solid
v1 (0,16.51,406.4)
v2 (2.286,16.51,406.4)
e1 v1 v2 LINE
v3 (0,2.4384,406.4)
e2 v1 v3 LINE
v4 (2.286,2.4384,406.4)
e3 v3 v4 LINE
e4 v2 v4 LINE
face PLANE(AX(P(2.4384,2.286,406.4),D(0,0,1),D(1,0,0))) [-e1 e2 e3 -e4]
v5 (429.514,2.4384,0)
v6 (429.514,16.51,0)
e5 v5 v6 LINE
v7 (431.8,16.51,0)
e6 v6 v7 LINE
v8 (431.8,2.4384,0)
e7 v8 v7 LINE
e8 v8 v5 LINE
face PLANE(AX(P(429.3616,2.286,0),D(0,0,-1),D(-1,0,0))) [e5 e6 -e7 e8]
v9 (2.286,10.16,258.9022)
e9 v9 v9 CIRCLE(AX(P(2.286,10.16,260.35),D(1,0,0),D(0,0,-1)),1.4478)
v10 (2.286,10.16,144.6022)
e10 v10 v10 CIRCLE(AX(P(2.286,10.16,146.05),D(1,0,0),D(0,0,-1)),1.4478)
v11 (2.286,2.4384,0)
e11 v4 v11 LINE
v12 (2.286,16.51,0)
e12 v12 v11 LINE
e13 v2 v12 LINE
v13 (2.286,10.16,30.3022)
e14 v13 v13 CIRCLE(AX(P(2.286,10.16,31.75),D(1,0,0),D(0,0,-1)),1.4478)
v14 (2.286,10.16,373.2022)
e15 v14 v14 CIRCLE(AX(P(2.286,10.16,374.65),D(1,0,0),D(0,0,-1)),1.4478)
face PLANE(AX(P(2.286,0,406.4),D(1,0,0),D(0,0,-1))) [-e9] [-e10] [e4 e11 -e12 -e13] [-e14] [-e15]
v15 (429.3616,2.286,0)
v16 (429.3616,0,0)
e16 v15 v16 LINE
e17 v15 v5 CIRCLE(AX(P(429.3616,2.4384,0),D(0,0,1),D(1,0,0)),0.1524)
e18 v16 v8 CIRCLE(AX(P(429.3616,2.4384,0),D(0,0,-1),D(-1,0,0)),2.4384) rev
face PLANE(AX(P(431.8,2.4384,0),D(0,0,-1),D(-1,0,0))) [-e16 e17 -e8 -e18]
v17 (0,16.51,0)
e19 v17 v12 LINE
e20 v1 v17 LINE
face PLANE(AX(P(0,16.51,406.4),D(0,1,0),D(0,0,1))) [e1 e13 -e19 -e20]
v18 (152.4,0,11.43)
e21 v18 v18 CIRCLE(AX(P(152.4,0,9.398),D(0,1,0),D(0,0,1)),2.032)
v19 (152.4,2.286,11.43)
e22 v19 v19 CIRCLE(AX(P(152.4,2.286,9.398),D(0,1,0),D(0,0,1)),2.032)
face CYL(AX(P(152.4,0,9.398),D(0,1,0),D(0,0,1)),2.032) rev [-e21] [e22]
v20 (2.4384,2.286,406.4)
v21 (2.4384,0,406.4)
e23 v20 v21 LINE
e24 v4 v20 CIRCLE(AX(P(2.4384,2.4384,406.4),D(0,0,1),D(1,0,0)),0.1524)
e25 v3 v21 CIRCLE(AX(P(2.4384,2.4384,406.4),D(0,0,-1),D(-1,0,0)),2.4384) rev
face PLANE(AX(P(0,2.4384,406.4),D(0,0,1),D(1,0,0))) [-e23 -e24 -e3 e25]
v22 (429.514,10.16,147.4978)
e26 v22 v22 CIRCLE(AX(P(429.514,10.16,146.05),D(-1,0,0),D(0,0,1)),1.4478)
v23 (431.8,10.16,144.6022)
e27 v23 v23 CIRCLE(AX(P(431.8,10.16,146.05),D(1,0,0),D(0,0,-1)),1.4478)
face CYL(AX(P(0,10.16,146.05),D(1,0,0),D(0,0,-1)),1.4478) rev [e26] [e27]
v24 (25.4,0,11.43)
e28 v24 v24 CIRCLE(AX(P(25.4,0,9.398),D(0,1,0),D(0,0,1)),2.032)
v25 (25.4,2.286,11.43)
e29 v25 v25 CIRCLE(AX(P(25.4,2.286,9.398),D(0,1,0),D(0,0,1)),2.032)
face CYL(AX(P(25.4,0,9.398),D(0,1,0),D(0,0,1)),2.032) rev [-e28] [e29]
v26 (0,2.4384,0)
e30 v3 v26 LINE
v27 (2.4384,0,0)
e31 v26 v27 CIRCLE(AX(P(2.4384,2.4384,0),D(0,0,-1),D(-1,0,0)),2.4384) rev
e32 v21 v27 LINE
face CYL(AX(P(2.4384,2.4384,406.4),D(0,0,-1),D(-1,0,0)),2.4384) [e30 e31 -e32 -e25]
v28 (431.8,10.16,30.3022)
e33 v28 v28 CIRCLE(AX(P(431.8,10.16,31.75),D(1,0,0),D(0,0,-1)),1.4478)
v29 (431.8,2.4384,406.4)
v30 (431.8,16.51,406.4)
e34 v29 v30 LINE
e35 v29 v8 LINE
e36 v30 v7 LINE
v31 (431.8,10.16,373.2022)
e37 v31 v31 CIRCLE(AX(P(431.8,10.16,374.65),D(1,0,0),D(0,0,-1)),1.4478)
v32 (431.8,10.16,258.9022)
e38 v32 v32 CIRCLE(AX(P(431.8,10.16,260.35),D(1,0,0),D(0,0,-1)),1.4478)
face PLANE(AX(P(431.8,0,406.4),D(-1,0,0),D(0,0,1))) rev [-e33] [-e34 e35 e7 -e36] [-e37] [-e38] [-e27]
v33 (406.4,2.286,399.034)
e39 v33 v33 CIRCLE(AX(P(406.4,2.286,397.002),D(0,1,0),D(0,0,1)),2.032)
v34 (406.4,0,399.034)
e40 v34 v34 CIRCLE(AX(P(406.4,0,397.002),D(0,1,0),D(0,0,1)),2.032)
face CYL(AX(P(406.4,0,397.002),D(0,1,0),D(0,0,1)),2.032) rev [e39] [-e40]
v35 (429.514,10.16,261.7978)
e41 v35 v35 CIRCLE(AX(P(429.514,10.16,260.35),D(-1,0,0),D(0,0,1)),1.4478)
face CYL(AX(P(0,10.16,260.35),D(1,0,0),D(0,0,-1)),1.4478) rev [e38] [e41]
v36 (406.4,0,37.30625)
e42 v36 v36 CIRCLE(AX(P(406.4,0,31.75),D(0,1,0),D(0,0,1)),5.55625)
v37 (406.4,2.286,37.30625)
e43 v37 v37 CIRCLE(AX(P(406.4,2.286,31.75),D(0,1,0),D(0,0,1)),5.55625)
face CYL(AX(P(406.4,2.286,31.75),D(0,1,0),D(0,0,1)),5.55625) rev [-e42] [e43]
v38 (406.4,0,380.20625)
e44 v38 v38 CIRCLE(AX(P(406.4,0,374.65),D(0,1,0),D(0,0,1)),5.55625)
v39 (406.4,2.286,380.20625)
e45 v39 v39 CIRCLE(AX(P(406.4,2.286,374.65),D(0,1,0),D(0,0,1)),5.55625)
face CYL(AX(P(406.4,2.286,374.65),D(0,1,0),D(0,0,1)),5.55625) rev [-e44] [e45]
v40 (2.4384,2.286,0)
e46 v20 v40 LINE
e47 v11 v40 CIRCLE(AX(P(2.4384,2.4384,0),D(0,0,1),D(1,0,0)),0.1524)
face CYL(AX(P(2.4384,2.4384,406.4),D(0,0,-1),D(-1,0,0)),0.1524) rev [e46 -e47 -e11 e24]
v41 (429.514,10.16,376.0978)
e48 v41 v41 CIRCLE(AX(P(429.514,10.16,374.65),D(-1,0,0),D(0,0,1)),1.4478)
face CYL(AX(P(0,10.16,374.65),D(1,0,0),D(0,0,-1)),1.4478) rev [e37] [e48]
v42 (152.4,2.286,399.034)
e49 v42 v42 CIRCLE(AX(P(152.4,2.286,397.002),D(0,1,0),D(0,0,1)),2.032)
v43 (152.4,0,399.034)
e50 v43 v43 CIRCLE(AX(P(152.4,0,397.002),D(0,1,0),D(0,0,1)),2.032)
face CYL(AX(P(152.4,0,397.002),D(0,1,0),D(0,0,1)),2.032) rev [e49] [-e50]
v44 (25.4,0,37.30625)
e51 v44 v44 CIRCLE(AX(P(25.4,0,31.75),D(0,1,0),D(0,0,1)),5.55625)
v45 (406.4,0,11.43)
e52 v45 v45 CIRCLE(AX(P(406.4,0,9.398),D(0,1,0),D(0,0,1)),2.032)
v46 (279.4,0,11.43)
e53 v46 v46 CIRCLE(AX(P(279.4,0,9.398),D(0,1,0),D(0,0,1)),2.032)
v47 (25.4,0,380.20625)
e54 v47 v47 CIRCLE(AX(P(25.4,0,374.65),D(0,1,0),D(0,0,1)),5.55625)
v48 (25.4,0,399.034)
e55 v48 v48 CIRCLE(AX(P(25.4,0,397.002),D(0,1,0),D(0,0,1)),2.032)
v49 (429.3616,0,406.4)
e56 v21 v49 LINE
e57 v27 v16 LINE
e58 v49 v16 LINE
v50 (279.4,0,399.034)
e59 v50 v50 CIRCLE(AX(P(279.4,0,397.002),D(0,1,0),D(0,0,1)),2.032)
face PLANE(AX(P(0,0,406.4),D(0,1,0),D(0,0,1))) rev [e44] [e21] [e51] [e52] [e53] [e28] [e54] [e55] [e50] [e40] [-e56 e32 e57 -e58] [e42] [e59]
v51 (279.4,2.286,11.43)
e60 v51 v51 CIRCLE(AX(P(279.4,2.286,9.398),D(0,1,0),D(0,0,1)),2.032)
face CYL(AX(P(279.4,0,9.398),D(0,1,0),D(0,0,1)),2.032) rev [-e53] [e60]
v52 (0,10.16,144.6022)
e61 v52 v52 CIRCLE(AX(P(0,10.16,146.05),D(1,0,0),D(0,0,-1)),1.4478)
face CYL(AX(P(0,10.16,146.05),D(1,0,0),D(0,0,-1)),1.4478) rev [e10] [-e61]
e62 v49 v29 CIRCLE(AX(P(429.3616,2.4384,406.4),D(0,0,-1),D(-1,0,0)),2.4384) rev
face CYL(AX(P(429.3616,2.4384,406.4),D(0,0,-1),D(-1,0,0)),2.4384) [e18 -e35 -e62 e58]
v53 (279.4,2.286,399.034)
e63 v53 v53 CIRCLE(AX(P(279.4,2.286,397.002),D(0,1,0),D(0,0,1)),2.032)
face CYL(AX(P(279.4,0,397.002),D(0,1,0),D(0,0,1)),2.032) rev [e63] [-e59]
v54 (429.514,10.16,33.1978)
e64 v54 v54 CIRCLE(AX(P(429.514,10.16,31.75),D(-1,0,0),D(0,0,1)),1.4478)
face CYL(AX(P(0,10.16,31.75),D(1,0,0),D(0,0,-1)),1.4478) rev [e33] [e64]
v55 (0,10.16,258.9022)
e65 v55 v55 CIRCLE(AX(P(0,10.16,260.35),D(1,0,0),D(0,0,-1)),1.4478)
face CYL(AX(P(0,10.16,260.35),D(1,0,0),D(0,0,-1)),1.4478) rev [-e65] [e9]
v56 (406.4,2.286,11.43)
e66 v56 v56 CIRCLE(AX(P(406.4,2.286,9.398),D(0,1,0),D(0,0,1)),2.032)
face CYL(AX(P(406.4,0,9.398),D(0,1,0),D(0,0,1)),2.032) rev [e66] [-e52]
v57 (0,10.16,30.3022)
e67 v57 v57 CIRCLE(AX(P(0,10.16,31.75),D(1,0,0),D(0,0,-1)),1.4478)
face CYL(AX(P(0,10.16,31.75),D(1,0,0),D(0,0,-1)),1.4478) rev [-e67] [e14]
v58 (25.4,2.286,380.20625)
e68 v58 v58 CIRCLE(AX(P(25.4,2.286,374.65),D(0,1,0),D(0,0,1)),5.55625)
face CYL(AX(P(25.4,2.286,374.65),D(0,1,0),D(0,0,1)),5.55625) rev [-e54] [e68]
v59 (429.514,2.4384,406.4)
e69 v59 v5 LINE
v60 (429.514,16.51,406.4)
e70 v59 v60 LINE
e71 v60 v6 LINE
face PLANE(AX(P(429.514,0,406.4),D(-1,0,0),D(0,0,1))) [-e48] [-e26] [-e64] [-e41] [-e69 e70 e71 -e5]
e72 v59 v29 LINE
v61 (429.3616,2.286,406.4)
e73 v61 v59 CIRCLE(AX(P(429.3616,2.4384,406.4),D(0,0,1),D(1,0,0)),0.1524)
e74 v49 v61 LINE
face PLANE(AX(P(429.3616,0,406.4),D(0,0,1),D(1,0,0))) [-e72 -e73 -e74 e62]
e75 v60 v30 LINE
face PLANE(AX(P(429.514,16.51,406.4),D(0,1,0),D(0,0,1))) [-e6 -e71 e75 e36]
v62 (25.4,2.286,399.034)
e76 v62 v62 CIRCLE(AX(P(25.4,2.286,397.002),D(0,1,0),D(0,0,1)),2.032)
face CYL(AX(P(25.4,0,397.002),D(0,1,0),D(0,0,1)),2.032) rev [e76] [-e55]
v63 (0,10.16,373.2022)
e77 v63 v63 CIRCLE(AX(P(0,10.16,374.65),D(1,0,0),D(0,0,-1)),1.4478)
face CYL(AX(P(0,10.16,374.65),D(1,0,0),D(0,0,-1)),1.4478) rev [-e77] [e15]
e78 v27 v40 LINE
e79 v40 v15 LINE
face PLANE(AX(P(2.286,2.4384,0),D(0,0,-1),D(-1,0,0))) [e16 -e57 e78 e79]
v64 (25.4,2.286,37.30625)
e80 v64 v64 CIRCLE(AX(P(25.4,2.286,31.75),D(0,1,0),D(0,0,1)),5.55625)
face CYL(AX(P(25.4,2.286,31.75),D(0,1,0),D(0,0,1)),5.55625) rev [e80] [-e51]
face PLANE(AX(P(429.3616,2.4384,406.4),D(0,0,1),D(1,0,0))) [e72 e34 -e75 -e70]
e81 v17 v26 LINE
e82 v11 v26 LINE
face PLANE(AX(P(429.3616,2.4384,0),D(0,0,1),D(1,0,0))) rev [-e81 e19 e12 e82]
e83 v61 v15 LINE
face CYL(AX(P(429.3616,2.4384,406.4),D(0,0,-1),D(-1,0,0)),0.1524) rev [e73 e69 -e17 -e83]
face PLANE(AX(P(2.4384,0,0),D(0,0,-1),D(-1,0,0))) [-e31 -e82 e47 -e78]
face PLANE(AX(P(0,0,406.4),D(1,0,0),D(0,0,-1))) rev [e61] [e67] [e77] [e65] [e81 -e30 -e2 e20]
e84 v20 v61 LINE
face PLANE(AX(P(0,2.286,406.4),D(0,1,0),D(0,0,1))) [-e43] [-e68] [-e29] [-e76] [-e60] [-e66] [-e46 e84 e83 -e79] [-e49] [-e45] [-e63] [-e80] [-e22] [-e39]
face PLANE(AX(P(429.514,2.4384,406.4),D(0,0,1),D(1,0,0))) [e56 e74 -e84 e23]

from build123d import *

# Parameters (mm, degrees)
BASE_FLANGE3_DEPTH             = 406.4
SKETCH10_R                     = 1.4478
CUT_EXTRUDE3_DEPTH             = 594.198769469
SKETCH11_R                     = 2.032
CUT_EXTRUDE4_DEPTH             = 594.139546967
F_7_16_0_4375_DIAMETER_HOLE1_D = 11.1125


# Sheet-metal steps are written as plain solids
with BuildPart() as part:
    # Sketch1 → Base-Flange3 (new body)
    with BuildSketch(Plane.XY):
        with BuildLine():
            Line((431.8, 16.51), (431.8, 2.4384))
            ThreePointArc((431.8, 2.4384), (431.085809175, 0.714190825), (429.3616, 0))
            Line((429.3616, 0), (2.4384, 0))
            ThreePointArc((2.4384, 0), (0.714190825, 0.714190825), (0, 2.4384))
            Line((0, 2.4384), (0, 16.51))
            Line((0, 16.51), (2.286, 16.51))
            Line((2.286, 16.51), (2.286, 2.4384))
            ThreePointArc((2.286, 2.4384), (2.330636927, 2.330636927), (2.4384, 2.286))
            Line((2.4384, 2.286), (429.3616, 2.286))
            ThreePointArc((429.3616, 2.286), (429.469363073, 2.330636927), (429.514, 2.4384))
            Line((429.514, 2.4384), (429.514, 16.51))
            Line((429.514, 16.51), (431.8, 16.51))
        make_face()
    extrude(amount=BASE_FLANGE3_DEPTH)

    # Sketch10 → Cut-Extrude3 (cut, through all)
    with BuildSketch(Plane(origin=(431.8, 0, 0), x_dir=(0, 0, -1), z_dir=(1, 0, 0))):
        with Locations((-31.75, 10.16)):
            Circle(SKETCH10_R)
        with Locations((-146.05, 10.16)):
            Circle(SKETCH10_R)
        with Locations((-260.35, 10.16)):
            Circle(SKETCH10_R)
        with Locations((-374.65, 10.16)):
            Circle(SKETCH10_R)
    extrude(amount=-CUT_EXTRUDE3_DEPTH, mode=Mode.SUBTRACT)

    # Sketch11 → Cut-Extrude4 (cut, through all)
    with BuildSketch(Plane(origin=(0, 2.286, 0), x_dir=(-1, 0, 0), z_dir=(0, 1, 0))):
        with Locations(Location((-406.4, 397.002, 0), (0, 0, 90))):
            Circle(SKETCH11_R)
        with Locations(Location((-279.4, 397.002, 0), (0, 0, 90))):
            Circle(SKETCH11_R)
        with Locations(Location((-152.4, 397.002, 0), (0, 0, 90))):
            Circle(SKETCH11_R)
        with Locations(Location((-25.4, 397.002, 0), (0, 0, 90))):
            Circle(SKETCH11_R)
        with Locations(Location((-406.4, 9.398, 0), (0, 0, 90))):
            Circle(SKETCH11_R)
        with Locations(Location((-279.4, 9.398, 0), (0, 0, 90))):
            Circle(SKETCH11_R)
        with Locations(Location((-152.4, 9.398, 0), (0, 0, 90))):
            Circle(SKETCH11_R)
        with Locations(Location((-25.4, 9.398, 0), (0, 0, 90))):
            Circle(SKETCH11_R)
    extrude(amount=-CUT_EXTRUDE4_DEPTH, mode=Mode.SUBTRACT)

    # 7/16 (0.4375) Diameter Hole1 (through all)
    with Locations(Plane(origin=(0, 2.286, 0), x_dir=(1, 0, 0), z_dir=(0, 1, 0))):
        with Locations((25.4, -31.75), (406.4, -31.75), (406.4, -374.65), (25.4, -374.65)):
            Hole(F_7_16_0_4375_DIAMETER_HOLE1_D / 2)


solid = part.part
